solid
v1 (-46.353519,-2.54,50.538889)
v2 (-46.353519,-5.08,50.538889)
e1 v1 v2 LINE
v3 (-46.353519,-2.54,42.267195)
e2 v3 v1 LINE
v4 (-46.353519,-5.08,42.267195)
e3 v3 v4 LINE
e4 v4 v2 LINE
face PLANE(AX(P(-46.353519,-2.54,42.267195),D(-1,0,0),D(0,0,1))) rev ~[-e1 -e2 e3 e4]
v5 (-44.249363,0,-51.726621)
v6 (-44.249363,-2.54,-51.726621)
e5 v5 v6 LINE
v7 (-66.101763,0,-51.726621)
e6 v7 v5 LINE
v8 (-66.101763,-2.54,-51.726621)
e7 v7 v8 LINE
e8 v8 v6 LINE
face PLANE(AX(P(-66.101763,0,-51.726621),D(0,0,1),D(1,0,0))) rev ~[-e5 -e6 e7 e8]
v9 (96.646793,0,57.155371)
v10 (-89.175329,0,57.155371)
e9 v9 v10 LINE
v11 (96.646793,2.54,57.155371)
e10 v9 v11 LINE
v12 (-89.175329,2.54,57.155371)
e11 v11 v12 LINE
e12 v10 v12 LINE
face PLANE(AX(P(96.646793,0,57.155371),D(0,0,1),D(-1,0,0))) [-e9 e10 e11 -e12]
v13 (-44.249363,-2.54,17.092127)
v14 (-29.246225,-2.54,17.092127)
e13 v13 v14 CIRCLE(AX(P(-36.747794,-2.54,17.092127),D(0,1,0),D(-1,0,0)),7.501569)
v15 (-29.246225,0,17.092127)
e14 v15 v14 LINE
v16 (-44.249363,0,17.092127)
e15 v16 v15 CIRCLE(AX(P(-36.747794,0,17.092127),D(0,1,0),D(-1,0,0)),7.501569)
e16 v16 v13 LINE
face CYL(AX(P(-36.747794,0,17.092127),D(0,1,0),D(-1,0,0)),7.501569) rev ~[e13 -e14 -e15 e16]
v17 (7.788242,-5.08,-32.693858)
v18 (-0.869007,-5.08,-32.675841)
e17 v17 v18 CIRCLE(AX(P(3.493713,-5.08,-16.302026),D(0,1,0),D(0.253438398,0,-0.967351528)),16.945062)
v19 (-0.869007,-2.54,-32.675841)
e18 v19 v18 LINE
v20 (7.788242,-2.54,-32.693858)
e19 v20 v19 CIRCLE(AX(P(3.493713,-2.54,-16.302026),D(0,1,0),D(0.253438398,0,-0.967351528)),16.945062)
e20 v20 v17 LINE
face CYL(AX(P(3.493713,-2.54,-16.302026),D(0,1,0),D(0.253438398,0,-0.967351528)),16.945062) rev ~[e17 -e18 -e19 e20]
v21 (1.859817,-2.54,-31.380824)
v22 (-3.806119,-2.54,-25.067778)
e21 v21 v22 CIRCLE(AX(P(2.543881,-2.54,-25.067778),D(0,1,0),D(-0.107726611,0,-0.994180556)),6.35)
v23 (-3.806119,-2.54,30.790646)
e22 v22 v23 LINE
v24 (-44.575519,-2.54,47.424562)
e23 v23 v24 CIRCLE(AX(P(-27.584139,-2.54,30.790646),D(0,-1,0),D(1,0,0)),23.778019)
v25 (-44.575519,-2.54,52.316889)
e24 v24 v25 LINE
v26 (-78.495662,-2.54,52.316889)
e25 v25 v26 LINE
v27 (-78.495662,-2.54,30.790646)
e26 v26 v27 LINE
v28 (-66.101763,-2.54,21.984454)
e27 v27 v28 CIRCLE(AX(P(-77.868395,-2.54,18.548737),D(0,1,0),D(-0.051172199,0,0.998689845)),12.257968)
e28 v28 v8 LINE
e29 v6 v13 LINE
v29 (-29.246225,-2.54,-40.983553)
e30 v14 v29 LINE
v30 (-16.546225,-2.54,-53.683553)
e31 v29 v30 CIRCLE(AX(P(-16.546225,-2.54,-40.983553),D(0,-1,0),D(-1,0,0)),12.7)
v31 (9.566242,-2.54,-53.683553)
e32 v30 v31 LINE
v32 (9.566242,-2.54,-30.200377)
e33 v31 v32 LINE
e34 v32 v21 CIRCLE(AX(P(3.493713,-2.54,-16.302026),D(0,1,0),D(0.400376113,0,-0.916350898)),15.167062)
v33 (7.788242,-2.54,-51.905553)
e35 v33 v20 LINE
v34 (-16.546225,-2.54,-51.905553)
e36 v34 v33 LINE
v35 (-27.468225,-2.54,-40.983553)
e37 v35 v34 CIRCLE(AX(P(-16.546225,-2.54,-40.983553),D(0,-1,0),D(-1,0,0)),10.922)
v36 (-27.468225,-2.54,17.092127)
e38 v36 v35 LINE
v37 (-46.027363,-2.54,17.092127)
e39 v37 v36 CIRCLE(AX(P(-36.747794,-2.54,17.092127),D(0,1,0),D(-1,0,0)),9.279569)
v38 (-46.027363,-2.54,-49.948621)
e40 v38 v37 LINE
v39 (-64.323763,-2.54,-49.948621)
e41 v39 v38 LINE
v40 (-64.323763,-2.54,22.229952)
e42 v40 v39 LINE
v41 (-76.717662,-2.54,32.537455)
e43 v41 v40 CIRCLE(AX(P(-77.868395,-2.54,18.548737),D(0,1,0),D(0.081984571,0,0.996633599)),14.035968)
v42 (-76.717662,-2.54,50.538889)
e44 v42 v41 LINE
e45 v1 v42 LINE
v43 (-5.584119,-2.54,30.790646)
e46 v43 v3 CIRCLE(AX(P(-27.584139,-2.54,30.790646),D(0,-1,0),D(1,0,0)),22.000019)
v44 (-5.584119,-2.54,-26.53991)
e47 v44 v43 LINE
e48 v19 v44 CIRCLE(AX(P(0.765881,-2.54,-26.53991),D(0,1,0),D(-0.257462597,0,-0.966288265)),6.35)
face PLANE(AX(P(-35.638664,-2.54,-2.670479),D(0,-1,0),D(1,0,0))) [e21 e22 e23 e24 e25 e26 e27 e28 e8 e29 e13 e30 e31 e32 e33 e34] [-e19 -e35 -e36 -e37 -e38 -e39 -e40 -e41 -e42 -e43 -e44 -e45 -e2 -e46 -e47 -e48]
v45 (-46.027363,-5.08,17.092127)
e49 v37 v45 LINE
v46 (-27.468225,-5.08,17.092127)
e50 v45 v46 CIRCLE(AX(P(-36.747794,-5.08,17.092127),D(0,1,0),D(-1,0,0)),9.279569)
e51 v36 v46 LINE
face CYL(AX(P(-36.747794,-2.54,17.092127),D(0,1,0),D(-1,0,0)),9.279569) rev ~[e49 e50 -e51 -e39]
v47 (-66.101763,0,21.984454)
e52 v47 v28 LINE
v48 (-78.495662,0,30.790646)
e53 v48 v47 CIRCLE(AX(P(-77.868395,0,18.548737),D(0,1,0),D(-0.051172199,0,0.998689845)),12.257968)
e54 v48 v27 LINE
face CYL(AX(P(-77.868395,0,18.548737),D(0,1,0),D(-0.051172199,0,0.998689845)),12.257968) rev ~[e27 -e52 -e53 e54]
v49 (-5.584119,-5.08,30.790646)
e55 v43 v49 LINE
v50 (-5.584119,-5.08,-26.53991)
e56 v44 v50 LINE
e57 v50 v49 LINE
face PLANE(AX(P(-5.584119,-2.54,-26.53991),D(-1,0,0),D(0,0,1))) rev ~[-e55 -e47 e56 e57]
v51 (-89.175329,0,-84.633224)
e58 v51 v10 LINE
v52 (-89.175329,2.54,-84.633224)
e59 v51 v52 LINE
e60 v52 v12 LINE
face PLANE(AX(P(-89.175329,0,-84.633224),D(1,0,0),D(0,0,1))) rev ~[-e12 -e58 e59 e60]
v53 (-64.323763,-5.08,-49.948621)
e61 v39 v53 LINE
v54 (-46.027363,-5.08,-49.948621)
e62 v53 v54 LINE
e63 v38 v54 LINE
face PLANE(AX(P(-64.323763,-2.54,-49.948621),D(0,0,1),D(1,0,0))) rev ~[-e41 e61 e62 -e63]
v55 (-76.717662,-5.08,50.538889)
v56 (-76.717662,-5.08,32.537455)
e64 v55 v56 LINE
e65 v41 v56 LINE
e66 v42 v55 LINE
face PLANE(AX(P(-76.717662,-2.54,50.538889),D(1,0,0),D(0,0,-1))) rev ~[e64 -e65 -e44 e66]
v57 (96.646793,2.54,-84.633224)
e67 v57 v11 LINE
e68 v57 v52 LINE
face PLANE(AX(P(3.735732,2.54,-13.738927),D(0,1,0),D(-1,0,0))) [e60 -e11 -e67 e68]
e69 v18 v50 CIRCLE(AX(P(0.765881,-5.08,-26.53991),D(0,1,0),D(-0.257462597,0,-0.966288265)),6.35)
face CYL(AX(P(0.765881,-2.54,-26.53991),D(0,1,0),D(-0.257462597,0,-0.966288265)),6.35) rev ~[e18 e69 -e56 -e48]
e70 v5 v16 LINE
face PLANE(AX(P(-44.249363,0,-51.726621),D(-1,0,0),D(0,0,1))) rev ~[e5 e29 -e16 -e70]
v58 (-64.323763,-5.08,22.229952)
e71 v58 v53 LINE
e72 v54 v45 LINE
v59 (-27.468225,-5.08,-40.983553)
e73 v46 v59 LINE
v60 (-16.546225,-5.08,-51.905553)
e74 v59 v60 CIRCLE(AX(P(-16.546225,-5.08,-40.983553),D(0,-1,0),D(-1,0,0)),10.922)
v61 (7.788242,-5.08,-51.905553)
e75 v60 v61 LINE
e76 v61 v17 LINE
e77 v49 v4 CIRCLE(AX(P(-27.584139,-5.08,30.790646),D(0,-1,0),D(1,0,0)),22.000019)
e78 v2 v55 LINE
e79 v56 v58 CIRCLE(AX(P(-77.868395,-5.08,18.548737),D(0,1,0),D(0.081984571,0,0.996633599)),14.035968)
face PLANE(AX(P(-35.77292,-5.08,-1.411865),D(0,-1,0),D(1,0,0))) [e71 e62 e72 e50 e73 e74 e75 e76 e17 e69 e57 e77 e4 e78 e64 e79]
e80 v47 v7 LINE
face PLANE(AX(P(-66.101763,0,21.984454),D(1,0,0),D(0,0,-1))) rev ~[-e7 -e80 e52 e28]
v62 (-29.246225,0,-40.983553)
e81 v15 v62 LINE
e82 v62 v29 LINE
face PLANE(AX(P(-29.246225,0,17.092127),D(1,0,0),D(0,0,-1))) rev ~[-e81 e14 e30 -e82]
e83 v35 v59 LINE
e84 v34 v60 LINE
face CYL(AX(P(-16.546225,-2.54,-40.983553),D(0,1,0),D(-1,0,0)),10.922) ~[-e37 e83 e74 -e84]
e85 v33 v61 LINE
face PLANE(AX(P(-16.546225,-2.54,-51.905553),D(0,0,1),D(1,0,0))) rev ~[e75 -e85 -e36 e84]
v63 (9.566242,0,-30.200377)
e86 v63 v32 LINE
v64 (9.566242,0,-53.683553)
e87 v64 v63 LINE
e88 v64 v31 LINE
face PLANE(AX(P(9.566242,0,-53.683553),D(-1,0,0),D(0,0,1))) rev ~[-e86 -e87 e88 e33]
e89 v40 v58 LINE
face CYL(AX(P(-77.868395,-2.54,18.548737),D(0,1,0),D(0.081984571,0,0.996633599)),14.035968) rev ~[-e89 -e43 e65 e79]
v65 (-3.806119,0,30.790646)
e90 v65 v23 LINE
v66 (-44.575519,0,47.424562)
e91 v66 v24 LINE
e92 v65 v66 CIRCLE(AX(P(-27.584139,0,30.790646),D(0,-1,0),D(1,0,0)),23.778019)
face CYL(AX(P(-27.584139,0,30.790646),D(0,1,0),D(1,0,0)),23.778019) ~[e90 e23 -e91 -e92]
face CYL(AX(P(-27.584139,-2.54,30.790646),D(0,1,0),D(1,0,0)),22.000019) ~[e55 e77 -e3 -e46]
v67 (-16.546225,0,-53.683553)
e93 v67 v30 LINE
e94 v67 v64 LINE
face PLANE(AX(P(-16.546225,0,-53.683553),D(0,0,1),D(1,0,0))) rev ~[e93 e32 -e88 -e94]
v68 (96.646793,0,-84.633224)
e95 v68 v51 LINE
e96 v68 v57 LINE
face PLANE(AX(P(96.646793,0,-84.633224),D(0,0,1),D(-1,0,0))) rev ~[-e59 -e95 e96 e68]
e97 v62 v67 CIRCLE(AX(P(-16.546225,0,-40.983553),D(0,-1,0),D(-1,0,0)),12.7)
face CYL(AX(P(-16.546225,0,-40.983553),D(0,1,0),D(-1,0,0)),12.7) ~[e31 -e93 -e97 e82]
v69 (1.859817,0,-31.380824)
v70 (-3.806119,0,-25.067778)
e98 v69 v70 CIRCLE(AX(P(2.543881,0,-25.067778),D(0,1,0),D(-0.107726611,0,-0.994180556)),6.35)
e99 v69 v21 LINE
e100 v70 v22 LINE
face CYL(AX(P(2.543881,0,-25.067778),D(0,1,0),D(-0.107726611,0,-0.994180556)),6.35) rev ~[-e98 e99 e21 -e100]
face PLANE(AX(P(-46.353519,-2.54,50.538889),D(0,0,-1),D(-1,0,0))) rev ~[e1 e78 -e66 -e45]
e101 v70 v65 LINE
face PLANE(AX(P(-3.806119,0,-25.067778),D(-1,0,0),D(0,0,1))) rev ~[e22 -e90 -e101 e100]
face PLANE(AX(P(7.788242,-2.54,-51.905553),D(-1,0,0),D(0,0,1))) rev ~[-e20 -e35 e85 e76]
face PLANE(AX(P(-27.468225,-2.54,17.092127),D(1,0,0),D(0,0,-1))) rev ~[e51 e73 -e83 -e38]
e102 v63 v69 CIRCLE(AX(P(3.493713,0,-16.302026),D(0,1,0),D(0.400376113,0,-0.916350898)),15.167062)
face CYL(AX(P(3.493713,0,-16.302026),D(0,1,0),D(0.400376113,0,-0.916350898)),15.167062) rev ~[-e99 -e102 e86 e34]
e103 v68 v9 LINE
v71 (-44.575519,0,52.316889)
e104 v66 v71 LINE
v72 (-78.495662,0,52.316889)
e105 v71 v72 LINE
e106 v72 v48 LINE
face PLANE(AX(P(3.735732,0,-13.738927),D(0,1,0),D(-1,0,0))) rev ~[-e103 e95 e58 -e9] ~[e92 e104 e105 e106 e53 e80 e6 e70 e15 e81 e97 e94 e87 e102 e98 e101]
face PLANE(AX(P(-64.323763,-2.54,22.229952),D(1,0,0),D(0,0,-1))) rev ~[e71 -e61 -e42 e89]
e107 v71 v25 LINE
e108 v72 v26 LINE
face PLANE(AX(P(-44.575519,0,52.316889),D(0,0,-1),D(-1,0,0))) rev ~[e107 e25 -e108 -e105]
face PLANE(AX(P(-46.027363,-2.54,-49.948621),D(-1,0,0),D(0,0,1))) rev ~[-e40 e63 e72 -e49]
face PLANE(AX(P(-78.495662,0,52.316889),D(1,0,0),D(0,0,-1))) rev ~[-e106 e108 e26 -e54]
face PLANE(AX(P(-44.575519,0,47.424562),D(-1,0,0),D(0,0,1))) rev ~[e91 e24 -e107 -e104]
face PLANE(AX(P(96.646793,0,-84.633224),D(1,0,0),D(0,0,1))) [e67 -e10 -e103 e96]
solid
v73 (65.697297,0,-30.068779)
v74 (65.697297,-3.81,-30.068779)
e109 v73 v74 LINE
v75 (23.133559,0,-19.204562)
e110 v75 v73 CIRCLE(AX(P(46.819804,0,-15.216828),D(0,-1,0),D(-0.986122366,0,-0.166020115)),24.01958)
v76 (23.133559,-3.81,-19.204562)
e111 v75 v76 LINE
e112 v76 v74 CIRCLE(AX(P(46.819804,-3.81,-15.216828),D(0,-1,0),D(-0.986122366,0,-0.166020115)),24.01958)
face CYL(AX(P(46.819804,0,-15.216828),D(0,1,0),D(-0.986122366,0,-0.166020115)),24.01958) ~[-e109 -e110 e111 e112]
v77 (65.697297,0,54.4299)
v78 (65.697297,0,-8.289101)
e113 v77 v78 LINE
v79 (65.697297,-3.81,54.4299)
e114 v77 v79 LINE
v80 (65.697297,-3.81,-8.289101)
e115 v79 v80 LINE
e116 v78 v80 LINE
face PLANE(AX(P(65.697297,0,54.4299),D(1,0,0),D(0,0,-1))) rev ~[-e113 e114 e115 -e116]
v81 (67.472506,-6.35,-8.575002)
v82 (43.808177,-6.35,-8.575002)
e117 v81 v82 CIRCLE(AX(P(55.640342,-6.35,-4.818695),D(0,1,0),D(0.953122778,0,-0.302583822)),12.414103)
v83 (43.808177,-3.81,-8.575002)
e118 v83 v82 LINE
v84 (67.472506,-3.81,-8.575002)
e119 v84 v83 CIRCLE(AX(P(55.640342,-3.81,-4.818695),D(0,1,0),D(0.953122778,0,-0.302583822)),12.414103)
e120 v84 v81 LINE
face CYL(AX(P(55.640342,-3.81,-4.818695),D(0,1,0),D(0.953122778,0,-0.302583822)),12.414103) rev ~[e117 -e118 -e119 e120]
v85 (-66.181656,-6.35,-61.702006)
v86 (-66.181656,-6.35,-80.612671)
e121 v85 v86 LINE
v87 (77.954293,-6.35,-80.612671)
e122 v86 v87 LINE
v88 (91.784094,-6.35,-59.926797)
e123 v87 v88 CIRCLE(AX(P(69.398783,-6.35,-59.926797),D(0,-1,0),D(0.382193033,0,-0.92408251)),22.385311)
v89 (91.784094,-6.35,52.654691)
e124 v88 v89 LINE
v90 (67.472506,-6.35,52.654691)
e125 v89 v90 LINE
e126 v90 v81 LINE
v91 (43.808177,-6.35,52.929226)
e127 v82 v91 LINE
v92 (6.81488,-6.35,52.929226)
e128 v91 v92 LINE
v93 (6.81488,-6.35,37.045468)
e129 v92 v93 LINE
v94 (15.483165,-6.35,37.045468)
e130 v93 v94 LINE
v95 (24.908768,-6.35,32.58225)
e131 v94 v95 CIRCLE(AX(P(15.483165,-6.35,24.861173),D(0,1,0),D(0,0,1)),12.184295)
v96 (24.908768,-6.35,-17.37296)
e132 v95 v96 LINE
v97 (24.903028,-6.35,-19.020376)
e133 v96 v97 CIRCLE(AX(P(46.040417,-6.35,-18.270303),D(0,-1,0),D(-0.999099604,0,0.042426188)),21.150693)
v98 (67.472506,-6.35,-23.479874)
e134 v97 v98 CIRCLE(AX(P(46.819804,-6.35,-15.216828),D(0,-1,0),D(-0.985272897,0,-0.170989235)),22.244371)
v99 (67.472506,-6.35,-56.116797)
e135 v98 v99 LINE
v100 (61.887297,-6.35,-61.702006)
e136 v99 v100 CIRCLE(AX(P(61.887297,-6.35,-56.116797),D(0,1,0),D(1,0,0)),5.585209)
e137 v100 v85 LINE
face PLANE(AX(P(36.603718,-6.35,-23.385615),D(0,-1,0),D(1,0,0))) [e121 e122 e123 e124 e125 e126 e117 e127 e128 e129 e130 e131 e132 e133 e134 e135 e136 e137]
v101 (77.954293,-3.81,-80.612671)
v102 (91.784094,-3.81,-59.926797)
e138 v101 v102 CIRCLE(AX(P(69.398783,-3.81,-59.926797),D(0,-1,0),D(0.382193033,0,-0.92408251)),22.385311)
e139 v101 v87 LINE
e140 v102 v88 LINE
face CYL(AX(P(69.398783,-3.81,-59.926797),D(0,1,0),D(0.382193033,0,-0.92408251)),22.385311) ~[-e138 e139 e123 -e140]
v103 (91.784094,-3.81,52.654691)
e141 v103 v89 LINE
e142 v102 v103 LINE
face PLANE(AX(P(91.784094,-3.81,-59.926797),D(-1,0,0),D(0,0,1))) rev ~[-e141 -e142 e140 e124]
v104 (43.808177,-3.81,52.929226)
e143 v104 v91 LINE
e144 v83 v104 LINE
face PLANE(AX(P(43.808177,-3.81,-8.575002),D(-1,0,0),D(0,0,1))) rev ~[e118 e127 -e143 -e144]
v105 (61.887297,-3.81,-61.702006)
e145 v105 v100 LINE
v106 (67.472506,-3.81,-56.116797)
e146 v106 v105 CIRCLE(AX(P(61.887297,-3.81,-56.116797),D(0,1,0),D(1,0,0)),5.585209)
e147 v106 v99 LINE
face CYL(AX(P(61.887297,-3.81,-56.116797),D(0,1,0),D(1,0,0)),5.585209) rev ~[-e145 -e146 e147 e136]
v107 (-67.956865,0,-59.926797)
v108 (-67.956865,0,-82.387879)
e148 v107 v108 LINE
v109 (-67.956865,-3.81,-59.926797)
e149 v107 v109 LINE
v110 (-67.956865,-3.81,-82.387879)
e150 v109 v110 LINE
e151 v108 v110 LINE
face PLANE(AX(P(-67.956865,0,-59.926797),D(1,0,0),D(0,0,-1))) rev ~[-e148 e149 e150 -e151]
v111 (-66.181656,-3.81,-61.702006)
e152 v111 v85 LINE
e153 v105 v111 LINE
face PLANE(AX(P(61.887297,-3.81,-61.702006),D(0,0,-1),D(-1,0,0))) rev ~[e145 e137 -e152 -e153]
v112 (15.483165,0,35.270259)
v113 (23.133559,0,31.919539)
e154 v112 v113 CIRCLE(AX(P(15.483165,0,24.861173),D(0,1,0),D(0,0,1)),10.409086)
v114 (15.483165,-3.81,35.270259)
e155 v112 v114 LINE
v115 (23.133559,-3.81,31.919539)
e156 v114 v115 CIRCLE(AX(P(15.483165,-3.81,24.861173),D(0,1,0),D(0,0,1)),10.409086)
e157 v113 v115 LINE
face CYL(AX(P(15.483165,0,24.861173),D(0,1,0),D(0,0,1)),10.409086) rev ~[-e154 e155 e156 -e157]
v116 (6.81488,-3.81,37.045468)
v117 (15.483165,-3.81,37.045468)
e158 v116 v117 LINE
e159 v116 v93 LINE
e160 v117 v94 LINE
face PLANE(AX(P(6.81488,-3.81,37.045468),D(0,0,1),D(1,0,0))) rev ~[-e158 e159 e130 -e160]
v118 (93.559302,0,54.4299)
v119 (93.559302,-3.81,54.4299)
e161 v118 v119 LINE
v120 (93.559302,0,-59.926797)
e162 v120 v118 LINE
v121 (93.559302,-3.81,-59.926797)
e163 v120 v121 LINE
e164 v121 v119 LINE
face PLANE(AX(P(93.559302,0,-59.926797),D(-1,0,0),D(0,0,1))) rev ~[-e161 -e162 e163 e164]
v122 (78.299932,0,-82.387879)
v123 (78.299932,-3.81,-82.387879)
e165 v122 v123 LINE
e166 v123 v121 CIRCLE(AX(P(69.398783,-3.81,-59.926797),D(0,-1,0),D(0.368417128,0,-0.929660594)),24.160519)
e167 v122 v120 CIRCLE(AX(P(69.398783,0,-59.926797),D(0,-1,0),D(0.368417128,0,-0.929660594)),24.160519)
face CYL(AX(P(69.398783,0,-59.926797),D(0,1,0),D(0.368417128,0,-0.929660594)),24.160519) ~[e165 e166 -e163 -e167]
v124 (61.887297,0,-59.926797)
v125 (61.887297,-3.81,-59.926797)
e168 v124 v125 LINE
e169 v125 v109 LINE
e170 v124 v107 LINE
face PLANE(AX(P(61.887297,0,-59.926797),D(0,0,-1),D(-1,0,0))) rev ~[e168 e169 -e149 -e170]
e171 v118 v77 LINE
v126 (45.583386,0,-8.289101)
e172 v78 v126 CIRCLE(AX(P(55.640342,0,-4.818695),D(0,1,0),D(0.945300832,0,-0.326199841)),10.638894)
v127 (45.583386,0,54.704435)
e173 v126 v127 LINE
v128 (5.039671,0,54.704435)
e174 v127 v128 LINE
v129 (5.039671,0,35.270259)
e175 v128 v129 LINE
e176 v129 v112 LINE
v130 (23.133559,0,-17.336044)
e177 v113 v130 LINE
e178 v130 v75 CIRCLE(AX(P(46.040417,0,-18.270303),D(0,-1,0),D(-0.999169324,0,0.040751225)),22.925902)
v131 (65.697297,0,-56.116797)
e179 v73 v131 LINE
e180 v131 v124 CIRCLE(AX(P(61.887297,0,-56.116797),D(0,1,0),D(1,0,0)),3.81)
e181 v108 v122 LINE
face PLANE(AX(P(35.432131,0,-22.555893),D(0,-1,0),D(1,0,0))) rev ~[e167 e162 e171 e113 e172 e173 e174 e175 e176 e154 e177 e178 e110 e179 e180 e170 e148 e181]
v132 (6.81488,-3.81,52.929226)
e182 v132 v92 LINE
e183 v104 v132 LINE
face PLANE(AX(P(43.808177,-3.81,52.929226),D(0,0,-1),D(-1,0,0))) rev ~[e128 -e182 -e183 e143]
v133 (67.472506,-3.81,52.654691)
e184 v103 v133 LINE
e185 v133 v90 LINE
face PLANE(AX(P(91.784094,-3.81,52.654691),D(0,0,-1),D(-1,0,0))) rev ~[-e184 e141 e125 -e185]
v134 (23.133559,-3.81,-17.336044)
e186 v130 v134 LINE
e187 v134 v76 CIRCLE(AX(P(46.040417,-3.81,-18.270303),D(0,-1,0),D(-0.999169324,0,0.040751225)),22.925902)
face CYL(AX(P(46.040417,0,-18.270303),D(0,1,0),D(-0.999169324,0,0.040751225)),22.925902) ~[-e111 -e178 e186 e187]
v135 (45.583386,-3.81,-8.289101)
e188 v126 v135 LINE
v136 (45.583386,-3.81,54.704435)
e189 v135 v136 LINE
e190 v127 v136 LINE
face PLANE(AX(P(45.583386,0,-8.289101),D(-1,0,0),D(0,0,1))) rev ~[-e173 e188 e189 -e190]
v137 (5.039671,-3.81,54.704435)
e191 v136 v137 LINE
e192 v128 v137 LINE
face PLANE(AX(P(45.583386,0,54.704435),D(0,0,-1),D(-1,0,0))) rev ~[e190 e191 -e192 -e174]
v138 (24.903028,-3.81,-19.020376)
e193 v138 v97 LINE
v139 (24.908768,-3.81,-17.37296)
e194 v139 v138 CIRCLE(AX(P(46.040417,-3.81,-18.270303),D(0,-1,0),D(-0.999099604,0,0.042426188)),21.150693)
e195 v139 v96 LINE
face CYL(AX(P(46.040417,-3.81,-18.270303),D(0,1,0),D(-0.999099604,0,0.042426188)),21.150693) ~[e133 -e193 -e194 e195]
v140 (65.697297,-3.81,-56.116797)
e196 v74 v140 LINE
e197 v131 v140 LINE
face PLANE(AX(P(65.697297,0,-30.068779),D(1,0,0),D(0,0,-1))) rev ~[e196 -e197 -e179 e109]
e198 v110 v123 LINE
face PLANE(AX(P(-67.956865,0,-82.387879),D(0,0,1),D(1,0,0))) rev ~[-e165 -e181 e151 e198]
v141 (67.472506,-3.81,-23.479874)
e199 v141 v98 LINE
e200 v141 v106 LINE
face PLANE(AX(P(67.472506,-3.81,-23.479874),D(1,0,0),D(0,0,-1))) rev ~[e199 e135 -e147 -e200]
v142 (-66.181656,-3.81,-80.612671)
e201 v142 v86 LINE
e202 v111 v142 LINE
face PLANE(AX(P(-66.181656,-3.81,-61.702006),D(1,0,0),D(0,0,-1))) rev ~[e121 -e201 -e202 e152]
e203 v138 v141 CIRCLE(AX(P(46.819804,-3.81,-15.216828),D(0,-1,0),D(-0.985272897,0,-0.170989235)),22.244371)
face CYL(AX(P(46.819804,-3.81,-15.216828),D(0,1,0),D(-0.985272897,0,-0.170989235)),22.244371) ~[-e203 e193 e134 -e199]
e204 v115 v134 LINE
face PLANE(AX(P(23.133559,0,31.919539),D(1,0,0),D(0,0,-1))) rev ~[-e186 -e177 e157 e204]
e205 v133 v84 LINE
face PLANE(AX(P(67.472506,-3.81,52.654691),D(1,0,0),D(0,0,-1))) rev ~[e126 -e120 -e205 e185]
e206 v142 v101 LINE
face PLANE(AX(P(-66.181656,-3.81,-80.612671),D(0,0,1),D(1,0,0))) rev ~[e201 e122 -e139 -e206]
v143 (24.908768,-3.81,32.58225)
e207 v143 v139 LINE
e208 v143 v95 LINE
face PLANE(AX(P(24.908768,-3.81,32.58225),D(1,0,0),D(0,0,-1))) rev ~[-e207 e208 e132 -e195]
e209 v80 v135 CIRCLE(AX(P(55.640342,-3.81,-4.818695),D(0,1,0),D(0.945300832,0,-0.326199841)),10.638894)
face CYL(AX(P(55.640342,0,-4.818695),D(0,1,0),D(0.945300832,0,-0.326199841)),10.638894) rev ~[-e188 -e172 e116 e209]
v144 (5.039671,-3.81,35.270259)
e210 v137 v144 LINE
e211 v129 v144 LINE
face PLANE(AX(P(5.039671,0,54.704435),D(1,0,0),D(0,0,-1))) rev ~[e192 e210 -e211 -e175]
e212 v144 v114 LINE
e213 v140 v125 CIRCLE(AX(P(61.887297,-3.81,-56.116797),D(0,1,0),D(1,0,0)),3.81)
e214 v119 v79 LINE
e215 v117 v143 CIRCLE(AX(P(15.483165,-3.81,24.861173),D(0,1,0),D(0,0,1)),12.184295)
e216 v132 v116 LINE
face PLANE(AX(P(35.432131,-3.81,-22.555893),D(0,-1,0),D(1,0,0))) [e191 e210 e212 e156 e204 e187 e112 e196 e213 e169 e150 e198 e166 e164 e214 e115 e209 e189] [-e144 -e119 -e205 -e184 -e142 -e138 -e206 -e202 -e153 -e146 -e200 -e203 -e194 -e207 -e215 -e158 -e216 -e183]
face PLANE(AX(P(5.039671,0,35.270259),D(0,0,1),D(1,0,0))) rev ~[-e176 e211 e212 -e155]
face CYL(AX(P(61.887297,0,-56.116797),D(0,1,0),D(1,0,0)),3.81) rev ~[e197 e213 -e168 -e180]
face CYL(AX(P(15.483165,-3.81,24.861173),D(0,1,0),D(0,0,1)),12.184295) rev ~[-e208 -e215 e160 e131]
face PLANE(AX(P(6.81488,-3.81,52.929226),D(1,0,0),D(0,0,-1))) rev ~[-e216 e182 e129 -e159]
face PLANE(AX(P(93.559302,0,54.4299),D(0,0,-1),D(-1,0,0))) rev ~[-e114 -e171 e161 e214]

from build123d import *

# Parameters (mm, degrees)
F1_DEPTH = 3.81
F2_W     = 185.822121799
F2_H     = 141.7885944247
F3_DEPTH = 2.54
F5_DEPTH = 2.54
F7_DEPTH = 2.54
F9_DEPTH = 2.54


# Not quite as in the source:
# - a feature names something its author has since deleted; it is built from what else it names


with BuildPart() as f1:
    # F0 (on Front) → F1 (new body)
    with BuildSketch(Plane.XZ):
        with BuildLine():
            Line((61.8872972369, -59.9267967045), (-67.9568648338, -59.9267967045))
            Line((-67.9568648338, -59.9267967045), (-67.9568648338, -82.3878794909))
            Line((-67.9568648338, -82.3878794909), (78.2999321818, -82.3878794909))
            ThreePointArc((78.2999321818, -82.3878794909), (89.3836158058, -73.5038786726), (93.5593023896, -59.9267967045))
            Line((93.5593023896, -59.9267967045), (93.5593023896, 54.4298999012))
            Line((93.5593023896, 54.4298999012), (65.6972972369, 54.4298999012))
            Line((65.6972972369, 54.4298999012), (65.6972972369, -8.2891006023))
            ThreePointArc((65.6972972369, -8.2891006023), (55.6403416055, -15.4575892654), (45.5833859742, -8.2891006023))
            Line((45.5833859742, -8.2891006023), (45.5833859742, 54.7044351697))
            Line((45.5833859742, 54.7044351697), (5.0396709703, 54.7044351697))
            Line((5.0396709703, 54.7044351697), (5.0396709703, 35.2702587843))
            Line((5.0396709703, 35.2702587843), (15.4831645885, 35.2702587843))
            ThreePointArc((15.4831645885, 35.2702587843), (19.6591632782, 34.3958519091), (23.1335591525, 31.9195389748))
            Line((23.1335591525, 31.9195389748), (23.1335591525, -17.3360444605))
            Line((23.1335591525, -17.3360444605), (23.1335591525, -19.20456164))
            ThreePointArc((23.1335591525, -19.20456164), (40.879363735, -38.4902332098), (65.6972972369, -30.0687793642))
            Line((65.6972972369, -30.0687793642), (65.6972972369, -56.1167967045))
            ThreePointArc((65.6972972369, -56.1167967045), (64.5813740732, -58.8108735409), (61.8872972369, -59.9267967045))
        make_face()
        with BuildLine():
            ThreePointArc((23.1335591525, -17.3360444605), (23.1145151518, -18.2703030503), (23.1335591525, -19.20456164))
            Line((23.1335591525, -19.20456164), (23.1335591525, -17.3360444605))
        make_face()
    extrude(amount=F1_DEPTH)

    # F8 (on face) → F9 (join)
    with BuildSketch(Plane.XZ.offset(3.81)):
        with BuildLine():
            Line((67.4725060976, -23.4798739041), (67.4725060976, -56.1167967045))
            ThreePointArc((67.4725060976, -56.1167967045), (65.8366362966, -60.0661357642), (61.8872972369, -61.7020055652))
            Line((61.8872972369, -61.7020055652), (-66.1816559732, -61.7020055652))
            Line((-66.1816559732, -61.7020055652), (-66.1816559732, -80.6126706302))
            Line((-66.1816559732, -80.6126706302), (77.9542927434, -80.6126706302))
            ThreePointArc((77.9542927434, -80.6126706302), (88.0081874746, -72.3683477517), (91.784093529, -59.9267967045))
            Line((91.784093529, -59.9267967045), (91.784093529, 52.6546910405))
            Line((91.784093529, 52.6546910405), (67.4725060976, 52.6546910405))
            Line((67.4725060976, 52.6546910405), (67.4725060976, -8.5750017462))
            ThreePointArc((67.4725060976, -8.5750017462), (55.6403416055, -17.2327981261), (43.8081771135, -8.5750017462))
            Line((43.8081771135, -8.5750017462), (43.8081771135, 52.9292263091))
            Line((43.8081771135, 52.9292263091), (6.8148798309, 52.9292263091))
            Line((6.8148798309, 52.9292263091), (6.8148798309, 37.0454676449))
            Line((6.8148798309, 37.0454676449), (15.4831645885, 37.0454676449))
            ThreePointArc((15.4831645885, 37.0454676449), (20.6976230432, 35.8732781186), (24.9087680131, 32.5822504214))
            Line((24.9087680131, 32.5822504214), (24.9087680131, -17.3729597743))
            ThreePointArc((24.9087680131, -17.3729597743), (24.8898523858, -18.1966120898), (24.9030282278, -19.0203762156))
            ThreePointArc((24.9030282278, -19.0203762156), (44.5022080749, -37.3401368279), (67.4725060976, -23.4798739041))
        make_face()
    extrude(amount=F9_DEPTH)


with BuildPart() as f3:
    # F2 (on face) → F3 (new body)
    with BuildSketch(Plane(origin=(0, 0, 0), x_dir=(-1, 0, 0), z_dir=(0, 1, 0))):
        with Locations((-3.7357322872, -13.7389265001)):
            Rectangle(F2_W, F2_H)
    extrude(amount=F3_DEPTH)

    # F4 (on face) → F5 (join)
    with BuildSketch(Plane.XZ):
        with BuildLine():
            Line((-66.1017629318, 21.9844542444), (-66.1017629318, -51.7266206443))
            Line((-66.1017629318, -51.7266206443), (-44.2493627779, -51.7266206443))
            Line((-44.2493627779, -51.7266206443), (-44.2493627779, 17.092127353))
            ThreePointArc((-44.2493627779, 17.092127353), (-36.7477941327, 24.5936959982), (-29.2462254874, 17.092127353))
            Line((-29.2462254874, 17.092127353), (-29.2462254874, -40.983552891))
            ThreePointArc((-29.2462254874, -40.983552891), (-25.5264816085, -49.9638090121), (-16.5462254874, -53.683552891))
            Line((-16.5462254874, -53.683552891), (9.566242341, -53.683552891))
            Line((9.566242341, -53.683552891), (9.566242341, -30.2003771067))
            ThreePointArc((9.566242341, -30.2003771067), (5.7901732638, -31.2942255388), (1.8598167011, -31.380824371))
            ThreePointArc((1.8598167011, -31.380824371), (-2.1819158801, -29.3091628597), (-3.8061193191, -25.0677778425))
            Line((-3.8061193191, -25.0677778425), (-3.8061193191, 30.7906456292))
            ThreePointArc((-3.8061193191, 30.7906456292), (-18.6015771181, 52.8067259199), (-44.5755193941, 47.4245622754))
            Line((-44.5755193941, 47.4245622754), (-44.5755193941, 52.3168891668))
            Line((-44.5755193941, 52.3168891668), (-78.4956621937, 52.3168891668))
            Line((-78.4956621937, 52.3168891668), (-78.4956621937, 30.7906456292))
            ThreePointArc((-78.4956621937, 30.7906456292), (-70.7684925993, 28.5411928963), (-66.1017629318, 21.9844542444))
        make_face()
    extrude(amount=F5_DEPTH)

    # F6 (on face) → F7 (join)
    with BuildSketch(Plane.XZ.offset(2.54)):
        with BuildLine():
            Line((-76.7176621937, 50.5388891668), (-76.7176621937, 32.5374547699))
            ThreePointArc((-76.7176621937, 32.5374547699), (-68.8934526322, 29.3403456584), (-64.3237629318, 22.2299520002))
            Line((-64.3237629318, 22.2299520002), (-64.3237629318, -49.9486206443))
            Line((-64.3237629318, -49.9486206443), (-46.0273627779, -49.9486206443))
            Line((-46.0273627779, -49.9486206443), (-46.0273627779, 17.092127353))
            ThreePointArc((-46.0273627779, 17.092127353), (-36.7477941327, 26.3716959982), (-27.4682254874, 17.092127353))
            Line((-27.4682254874, 17.092127353), (-27.4682254874, -40.983552891))
            ThreePointArc((-27.4682254874, -40.983552891), (-24.2692457516, -48.7065731551), (-16.5462254874, -51.905552891))
            Line((-16.5462254874, -51.905552891), (7.788242341, -51.905552891))
            Line((7.788242341, -51.905552891), (7.788242341, -32.6938578527))
            ThreePointArc((7.788242341, -32.6938578527), (3.4584477385, -33.2470515492), (-0.8690068072, -32.6758408003))
            ThreePointArc((-0.8690068072, -32.6758408003), (-4.2691980449, -30.4090810578), (-5.5841193191, -26.5399103165))
            Line((-5.5841193191, -26.5399103165), (-5.5841193191, 30.7906456292))
            ThreePointArc((-5.5841193191, 30.7906456292), (-21.6228421821, 51.9676094036), (-46.3535193941, 42.2671954734))
            Line((-46.3535193941, 42.2671954734), (-46.3535193941, 50.5388891668))
            Line((-46.3535193941, 50.5388891668), (-76.7176621937, 50.5388891668))
        make_face()
    extrude(amount=F7_DEPTH)


solid = Compound([f1.part, f3.part])
